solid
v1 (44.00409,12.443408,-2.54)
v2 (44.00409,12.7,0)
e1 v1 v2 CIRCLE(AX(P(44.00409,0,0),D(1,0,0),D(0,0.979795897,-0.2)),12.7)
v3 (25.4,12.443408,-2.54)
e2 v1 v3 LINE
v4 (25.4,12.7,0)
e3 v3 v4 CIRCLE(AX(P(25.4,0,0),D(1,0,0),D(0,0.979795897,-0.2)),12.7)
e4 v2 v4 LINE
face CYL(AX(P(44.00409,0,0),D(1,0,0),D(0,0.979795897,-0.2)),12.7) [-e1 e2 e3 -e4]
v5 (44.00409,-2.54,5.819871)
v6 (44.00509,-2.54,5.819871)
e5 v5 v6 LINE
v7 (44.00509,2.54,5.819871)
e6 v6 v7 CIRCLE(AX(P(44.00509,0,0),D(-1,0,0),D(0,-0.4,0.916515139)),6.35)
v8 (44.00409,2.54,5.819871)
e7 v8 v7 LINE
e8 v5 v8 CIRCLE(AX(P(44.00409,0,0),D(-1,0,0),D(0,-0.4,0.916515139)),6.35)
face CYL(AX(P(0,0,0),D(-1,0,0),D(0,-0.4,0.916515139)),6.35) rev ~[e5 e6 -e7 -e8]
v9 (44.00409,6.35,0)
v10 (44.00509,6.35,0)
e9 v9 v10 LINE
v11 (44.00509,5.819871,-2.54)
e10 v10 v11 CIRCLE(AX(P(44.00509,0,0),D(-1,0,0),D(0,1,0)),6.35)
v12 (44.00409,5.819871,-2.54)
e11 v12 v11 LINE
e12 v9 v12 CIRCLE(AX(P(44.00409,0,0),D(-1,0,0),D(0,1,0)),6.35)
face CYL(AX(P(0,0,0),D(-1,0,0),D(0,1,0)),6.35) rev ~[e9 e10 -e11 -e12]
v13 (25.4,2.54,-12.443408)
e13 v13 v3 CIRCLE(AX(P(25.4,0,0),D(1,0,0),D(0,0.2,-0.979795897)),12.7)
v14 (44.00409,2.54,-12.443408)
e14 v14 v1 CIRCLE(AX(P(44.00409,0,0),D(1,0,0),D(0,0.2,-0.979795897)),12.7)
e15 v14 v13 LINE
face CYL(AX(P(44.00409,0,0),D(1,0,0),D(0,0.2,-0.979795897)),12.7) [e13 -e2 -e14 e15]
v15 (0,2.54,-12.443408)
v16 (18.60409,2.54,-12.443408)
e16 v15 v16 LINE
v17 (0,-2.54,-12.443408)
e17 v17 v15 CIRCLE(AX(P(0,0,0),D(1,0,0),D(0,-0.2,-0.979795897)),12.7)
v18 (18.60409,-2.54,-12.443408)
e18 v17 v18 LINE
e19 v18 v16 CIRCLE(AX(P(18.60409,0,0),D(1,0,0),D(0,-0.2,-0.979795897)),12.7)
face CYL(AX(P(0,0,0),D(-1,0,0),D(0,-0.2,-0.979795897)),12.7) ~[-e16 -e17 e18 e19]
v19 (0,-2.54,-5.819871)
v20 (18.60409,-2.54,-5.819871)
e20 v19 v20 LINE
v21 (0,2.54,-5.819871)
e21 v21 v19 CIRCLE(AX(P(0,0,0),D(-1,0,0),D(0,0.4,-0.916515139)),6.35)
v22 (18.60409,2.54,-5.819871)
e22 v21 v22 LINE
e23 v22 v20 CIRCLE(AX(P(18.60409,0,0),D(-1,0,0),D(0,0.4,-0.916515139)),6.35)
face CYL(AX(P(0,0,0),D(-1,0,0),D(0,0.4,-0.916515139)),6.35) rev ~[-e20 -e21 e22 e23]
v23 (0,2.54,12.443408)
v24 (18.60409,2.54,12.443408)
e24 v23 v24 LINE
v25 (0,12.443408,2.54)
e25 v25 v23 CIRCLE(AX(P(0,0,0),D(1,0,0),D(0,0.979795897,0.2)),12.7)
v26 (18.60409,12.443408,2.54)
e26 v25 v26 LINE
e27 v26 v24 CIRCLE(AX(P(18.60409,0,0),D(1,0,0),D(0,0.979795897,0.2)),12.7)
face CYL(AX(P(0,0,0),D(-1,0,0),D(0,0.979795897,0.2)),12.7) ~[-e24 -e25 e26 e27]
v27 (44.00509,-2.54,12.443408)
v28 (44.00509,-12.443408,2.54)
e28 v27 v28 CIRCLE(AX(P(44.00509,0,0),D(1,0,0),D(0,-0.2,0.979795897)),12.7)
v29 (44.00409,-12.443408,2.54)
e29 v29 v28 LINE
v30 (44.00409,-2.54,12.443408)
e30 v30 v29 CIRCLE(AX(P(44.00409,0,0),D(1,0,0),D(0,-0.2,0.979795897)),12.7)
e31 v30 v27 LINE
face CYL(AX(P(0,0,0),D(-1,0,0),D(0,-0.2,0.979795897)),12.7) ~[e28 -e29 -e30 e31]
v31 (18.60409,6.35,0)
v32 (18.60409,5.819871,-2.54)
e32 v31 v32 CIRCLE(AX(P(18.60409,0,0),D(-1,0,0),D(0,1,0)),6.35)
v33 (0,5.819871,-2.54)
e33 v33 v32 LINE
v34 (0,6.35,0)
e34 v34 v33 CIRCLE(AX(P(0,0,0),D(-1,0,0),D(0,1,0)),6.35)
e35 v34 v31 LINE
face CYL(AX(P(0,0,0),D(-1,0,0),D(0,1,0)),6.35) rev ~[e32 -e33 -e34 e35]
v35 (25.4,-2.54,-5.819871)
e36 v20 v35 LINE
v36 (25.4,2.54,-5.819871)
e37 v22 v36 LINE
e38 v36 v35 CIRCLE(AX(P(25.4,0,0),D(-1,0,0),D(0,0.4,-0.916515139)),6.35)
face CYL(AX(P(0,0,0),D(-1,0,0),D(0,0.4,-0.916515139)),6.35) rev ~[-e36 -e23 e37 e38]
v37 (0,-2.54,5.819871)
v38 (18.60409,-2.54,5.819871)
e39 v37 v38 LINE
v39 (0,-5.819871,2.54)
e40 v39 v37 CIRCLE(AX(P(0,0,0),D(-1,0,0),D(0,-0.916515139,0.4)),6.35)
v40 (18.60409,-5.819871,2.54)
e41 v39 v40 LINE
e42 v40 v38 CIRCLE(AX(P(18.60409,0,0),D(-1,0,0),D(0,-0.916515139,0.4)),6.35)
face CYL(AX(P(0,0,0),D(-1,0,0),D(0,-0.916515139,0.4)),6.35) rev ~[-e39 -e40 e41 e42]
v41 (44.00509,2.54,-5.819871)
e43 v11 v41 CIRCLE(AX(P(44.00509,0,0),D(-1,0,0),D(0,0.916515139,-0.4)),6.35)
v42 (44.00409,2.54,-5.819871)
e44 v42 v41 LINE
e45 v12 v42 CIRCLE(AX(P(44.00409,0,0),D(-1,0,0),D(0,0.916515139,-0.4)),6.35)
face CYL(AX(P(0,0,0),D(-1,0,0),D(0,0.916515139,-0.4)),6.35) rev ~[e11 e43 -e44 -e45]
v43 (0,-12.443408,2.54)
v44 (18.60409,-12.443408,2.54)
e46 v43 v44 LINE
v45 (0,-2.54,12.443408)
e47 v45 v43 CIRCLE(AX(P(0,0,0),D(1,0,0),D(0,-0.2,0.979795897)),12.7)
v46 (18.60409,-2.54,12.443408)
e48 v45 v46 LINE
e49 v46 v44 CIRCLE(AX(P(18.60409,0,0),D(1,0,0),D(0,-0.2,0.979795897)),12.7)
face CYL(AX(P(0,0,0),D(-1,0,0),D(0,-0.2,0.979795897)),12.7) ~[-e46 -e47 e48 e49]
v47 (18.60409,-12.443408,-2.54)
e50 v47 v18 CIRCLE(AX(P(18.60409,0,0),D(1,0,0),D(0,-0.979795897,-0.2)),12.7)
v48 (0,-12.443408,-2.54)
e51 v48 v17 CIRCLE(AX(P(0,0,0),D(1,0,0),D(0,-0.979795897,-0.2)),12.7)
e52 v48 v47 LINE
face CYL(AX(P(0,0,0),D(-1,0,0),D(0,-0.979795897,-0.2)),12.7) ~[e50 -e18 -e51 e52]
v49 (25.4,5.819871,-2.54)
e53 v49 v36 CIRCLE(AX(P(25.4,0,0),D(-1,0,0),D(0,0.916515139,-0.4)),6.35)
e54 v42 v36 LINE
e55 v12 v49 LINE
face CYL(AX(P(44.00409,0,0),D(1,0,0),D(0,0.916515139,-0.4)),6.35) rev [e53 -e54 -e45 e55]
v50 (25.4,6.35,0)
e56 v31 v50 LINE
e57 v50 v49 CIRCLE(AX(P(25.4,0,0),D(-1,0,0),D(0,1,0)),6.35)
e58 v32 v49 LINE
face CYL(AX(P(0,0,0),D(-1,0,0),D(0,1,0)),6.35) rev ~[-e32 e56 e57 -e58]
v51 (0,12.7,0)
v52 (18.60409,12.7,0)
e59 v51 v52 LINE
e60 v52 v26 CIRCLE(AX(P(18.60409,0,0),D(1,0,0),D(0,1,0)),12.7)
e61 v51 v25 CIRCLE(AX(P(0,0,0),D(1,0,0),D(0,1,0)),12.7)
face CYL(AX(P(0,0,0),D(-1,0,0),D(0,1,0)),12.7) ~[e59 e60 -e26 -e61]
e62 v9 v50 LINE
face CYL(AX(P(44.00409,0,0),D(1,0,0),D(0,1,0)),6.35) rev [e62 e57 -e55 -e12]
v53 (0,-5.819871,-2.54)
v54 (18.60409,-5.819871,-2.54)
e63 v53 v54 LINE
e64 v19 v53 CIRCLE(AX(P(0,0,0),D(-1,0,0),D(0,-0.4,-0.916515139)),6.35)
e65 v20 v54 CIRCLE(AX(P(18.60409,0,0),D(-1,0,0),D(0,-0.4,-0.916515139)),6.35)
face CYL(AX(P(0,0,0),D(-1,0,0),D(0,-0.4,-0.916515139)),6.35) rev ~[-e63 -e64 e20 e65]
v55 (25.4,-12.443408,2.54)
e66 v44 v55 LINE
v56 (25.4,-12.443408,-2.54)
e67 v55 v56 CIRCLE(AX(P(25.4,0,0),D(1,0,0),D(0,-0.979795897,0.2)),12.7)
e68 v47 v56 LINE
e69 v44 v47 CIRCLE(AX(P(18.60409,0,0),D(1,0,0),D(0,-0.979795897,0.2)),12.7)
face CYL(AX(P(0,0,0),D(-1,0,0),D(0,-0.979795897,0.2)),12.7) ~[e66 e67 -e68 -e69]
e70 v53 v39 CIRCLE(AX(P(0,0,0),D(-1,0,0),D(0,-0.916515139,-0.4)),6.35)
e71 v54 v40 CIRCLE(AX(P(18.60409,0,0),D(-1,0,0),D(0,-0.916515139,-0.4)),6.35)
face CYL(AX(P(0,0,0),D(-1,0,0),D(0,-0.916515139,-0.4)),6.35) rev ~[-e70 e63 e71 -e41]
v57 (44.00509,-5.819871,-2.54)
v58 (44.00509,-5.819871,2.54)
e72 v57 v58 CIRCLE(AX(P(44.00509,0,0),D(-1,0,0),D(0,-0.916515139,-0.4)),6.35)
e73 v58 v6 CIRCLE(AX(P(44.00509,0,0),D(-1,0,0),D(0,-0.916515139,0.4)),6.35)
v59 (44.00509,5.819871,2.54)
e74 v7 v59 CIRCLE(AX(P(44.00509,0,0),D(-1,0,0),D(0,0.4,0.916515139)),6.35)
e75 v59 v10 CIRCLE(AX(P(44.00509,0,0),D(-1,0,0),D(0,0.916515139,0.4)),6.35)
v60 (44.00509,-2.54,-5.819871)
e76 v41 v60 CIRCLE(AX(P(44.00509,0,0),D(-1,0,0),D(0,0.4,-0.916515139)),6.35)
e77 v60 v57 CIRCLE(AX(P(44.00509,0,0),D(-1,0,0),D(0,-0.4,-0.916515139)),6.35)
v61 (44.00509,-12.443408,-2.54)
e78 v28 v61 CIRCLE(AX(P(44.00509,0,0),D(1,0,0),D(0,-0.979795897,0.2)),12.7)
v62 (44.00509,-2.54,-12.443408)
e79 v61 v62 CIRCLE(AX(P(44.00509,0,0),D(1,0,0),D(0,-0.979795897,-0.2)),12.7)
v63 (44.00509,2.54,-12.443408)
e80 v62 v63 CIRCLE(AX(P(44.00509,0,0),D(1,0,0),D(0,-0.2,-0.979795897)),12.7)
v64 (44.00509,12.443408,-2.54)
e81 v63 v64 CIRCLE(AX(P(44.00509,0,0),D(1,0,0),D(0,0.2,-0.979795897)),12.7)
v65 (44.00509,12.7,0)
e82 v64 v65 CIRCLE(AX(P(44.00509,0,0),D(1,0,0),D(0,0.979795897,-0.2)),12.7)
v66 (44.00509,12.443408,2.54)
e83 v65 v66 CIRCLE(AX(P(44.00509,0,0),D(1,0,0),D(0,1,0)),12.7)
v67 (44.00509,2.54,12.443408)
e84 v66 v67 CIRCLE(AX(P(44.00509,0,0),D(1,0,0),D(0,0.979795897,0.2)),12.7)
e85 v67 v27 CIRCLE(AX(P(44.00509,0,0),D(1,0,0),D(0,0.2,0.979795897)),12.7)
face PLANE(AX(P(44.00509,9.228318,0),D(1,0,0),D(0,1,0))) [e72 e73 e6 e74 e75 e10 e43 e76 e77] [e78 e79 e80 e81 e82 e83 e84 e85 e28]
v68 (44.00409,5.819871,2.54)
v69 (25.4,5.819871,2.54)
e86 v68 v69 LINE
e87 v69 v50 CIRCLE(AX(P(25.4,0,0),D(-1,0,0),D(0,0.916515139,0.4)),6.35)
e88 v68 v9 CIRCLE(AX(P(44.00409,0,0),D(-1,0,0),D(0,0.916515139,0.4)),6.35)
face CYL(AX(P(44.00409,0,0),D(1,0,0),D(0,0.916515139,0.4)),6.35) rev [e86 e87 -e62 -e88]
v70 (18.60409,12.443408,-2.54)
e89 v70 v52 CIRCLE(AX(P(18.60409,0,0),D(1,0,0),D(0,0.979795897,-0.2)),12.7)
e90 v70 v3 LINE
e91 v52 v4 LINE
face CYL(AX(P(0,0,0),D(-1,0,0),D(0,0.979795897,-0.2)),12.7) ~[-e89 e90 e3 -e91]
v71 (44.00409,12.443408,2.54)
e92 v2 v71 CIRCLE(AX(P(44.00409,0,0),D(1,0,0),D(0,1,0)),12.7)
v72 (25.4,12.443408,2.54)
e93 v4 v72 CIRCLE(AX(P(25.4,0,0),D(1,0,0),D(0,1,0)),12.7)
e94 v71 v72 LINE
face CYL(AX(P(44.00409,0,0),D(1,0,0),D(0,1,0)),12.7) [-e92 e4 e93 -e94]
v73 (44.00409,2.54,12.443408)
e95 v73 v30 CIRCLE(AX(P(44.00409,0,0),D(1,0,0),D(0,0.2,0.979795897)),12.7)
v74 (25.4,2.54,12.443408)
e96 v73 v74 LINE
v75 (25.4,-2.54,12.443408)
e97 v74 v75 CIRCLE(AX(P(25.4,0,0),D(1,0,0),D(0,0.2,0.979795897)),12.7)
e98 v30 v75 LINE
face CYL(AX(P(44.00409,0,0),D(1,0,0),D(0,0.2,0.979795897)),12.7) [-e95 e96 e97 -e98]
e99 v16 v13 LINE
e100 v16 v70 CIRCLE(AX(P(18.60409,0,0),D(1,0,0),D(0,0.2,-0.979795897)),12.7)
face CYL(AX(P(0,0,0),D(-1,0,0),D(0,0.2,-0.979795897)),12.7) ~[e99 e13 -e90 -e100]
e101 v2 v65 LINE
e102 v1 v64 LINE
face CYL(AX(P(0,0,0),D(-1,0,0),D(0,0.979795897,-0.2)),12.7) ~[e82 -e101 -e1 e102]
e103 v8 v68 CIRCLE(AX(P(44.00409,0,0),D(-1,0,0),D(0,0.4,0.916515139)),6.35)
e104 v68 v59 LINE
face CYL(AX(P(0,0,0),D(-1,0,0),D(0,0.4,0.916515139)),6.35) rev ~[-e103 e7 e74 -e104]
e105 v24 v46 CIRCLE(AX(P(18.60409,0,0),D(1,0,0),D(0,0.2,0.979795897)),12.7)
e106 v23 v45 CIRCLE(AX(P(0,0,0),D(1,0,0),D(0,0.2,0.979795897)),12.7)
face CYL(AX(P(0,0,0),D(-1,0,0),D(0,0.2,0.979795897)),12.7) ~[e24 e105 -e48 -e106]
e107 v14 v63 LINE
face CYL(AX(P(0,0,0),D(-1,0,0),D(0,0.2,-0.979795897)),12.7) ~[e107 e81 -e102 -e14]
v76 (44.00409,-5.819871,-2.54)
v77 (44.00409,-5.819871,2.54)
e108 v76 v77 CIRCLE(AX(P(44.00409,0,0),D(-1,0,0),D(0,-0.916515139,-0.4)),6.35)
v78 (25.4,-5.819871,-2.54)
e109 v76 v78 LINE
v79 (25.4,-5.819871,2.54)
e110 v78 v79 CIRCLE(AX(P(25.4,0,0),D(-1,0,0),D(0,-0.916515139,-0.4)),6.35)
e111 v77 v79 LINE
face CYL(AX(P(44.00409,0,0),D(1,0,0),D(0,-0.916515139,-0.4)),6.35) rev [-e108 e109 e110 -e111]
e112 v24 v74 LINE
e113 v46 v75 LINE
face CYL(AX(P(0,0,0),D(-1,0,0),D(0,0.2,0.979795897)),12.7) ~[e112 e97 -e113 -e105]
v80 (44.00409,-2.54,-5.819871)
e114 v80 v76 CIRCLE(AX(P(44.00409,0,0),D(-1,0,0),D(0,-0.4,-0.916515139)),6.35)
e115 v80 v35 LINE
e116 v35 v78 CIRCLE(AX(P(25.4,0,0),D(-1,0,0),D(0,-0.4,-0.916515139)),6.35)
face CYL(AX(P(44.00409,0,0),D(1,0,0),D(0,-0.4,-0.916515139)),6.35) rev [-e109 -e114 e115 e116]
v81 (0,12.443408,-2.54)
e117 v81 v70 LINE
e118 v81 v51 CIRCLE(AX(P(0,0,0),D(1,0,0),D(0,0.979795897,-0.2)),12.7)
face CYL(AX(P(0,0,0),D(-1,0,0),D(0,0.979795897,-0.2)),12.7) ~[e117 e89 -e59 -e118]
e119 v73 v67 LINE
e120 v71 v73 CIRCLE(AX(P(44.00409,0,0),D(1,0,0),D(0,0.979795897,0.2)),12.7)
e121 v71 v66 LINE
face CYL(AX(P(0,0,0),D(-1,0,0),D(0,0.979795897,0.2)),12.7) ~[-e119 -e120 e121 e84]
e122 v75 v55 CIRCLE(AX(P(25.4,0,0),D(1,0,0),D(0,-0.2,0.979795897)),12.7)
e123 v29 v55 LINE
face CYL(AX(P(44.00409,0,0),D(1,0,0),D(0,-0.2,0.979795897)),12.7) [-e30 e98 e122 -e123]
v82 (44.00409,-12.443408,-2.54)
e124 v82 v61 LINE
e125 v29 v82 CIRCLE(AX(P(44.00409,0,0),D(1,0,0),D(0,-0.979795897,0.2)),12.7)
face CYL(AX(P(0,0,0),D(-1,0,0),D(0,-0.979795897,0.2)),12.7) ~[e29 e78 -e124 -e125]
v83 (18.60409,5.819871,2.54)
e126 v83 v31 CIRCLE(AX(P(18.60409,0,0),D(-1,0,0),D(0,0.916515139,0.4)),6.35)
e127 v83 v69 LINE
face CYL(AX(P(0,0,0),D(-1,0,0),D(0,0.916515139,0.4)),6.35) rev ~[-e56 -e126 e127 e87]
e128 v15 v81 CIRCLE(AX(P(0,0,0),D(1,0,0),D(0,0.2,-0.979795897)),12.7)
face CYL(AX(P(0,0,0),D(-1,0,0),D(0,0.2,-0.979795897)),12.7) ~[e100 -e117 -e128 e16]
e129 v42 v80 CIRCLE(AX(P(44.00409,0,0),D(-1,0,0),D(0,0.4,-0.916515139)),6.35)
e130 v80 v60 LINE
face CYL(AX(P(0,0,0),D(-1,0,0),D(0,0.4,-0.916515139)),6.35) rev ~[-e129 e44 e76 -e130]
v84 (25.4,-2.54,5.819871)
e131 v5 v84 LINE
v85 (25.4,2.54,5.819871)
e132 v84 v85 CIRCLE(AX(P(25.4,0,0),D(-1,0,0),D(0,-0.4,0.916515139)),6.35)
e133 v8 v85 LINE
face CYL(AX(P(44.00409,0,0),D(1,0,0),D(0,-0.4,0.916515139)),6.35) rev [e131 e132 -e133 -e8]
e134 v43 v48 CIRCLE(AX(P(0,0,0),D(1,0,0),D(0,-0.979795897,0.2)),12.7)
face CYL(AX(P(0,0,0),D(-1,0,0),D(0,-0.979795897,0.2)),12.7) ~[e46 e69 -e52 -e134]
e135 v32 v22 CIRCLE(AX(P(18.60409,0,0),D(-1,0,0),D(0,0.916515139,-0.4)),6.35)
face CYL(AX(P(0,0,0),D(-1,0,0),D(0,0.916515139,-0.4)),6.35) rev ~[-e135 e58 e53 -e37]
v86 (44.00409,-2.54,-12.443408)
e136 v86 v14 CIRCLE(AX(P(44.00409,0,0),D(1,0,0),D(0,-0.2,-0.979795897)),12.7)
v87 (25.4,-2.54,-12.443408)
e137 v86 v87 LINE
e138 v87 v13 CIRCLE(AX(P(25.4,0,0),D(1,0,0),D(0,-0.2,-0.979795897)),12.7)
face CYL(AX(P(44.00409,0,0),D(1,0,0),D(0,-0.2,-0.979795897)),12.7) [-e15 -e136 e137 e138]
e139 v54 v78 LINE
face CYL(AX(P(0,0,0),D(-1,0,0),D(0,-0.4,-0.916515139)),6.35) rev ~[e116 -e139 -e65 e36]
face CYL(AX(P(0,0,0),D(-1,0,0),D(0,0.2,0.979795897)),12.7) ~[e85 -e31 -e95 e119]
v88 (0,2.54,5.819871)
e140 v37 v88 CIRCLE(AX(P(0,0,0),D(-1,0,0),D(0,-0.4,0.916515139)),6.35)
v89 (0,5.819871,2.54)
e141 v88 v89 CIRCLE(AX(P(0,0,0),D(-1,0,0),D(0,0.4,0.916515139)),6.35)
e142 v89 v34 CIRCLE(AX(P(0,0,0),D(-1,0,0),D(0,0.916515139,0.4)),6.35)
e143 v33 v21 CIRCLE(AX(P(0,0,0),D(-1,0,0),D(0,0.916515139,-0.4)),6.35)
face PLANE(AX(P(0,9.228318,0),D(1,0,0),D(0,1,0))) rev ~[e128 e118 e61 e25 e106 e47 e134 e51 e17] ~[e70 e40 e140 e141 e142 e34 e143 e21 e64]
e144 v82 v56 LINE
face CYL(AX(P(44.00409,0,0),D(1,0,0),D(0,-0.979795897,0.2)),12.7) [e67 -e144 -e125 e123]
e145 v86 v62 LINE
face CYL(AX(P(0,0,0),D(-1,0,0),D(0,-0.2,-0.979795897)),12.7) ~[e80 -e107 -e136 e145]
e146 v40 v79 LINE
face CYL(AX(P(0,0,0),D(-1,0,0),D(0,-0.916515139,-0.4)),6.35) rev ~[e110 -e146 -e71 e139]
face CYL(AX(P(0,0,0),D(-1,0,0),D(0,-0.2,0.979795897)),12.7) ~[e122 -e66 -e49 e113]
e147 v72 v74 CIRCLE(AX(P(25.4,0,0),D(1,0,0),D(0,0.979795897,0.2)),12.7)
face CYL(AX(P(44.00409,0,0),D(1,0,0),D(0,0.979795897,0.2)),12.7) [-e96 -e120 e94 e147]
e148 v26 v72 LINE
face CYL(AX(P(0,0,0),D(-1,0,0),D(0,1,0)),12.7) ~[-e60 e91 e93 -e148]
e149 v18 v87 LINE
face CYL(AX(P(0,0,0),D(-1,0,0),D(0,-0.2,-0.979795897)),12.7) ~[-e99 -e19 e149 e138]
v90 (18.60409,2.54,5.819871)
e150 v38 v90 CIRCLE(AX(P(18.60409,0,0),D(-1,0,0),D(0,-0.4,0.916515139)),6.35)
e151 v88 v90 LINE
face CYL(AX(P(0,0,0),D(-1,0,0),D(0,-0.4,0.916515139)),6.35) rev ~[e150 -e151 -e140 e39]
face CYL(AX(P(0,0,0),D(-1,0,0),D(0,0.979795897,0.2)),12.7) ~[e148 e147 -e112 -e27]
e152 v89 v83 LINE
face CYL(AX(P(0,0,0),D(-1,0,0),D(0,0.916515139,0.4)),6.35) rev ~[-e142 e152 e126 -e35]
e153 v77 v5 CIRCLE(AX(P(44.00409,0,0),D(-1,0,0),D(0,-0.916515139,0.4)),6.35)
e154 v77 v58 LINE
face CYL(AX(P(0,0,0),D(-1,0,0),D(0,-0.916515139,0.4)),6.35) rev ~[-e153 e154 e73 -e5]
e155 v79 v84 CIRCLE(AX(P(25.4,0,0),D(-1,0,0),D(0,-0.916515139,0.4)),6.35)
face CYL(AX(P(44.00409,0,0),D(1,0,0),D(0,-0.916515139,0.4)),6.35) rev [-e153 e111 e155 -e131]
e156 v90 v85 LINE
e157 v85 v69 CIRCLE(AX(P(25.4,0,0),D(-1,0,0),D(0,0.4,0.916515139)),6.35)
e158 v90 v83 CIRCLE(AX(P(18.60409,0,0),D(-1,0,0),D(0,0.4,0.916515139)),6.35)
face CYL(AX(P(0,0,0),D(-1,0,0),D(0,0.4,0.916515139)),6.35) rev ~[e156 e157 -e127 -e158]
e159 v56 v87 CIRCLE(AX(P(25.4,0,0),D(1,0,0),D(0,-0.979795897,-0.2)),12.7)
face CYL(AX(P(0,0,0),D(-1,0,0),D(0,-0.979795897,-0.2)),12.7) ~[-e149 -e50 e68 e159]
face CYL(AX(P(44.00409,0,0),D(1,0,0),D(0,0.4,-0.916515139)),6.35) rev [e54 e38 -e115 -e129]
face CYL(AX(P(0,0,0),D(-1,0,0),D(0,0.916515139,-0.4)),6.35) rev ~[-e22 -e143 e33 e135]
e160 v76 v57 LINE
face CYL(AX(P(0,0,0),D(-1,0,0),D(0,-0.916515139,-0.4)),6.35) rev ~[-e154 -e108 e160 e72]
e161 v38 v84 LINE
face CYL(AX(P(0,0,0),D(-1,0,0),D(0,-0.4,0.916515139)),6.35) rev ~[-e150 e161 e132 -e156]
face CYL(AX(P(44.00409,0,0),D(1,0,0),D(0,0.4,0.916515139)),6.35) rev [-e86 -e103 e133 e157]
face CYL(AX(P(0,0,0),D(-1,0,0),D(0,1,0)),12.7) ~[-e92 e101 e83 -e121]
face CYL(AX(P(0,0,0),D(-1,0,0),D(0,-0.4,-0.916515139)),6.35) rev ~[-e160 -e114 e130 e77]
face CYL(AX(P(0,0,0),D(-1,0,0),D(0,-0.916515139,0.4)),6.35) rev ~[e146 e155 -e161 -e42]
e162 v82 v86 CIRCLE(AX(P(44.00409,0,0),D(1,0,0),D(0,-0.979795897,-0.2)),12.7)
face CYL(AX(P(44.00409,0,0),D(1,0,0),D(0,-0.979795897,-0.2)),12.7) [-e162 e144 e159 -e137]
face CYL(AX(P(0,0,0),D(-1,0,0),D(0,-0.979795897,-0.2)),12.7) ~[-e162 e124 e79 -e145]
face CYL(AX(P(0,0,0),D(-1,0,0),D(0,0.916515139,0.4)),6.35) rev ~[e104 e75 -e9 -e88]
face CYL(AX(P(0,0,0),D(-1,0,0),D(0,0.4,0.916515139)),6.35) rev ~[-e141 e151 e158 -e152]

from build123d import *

# Parameters (mm, degrees)
F1_DEPTH = 25.4
F2_DEPTH = 44.00509


# Not quite as in the source:
# - a pattern or mirror of a feature is missing from the dataset's text; its kind, count and spacing are read off the source's solid
# - a feature names something its author has since deleted; it is built from what else it names


with BuildPart() as f1:
    # F0 (on Right) → F1 (new body)
    with BuildSketch(Plane.YZ):
        with BuildLine():
            ThreePointArc((12.4434078933, -2.54), (12.6356891432, -1.2764638175), (12.7, 0))
            ThreePointArc((12.7, 0), (12.6356891432, 1.2764638175), (12.4434078933, 2.54))
            Line((12.4434078933, 2.54), (5.8198711326, 2.54))
            ThreePointArc((5.8198711326, 2.54), (6.2160550871, 1.2973662374), (6.35, 0))
            ThreePointArc((6.35, 0), (6.2160550871, -1.2973662374), (5.8198711326, -2.54))
            Line((5.8198711326, -2.54), (12.4434078933, -2.54))
        make_face()
        with BuildLine():
            Line((5.8198711326, 2.54), (12.4434078933, 2.54))
            ThreePointArc((12.4434078933, 2.54), (8.9802561211, 8.9802561211), (2.54, 12.4434078933))
            Line((2.54, 12.4434078933), (2.54, 5.8198711326))
            ThreePointArc((2.54, 5.8198711326), (4.4901280605, 4.4901280605), (5.8198711326, 2.54))
        make_face()
        with BuildLine():
            ThreePointArc((2.54, -12.4434078933), (8.9802561211, -8.9802561211), (12.4434078933, -2.54))
            Line((12.4434078933, -2.54), (5.8198711326, -2.54))
            ThreePointArc((5.8198711326, -2.54), (4.4901280605, -4.4901280605), (2.54, -5.8198711326))
            Line((2.54, -5.8198711326), (2.54, -12.4434078933))
        make_face()
        with BuildLine():
            Line((2.54, 5.8198711326), (2.54, 12.4434078933))
            ThreePointArc((2.54, 12.4434078933), (0, 12.7), (-2.54, 12.4434078933))
            Line((-2.54, 12.4434078933), (-2.54, 5.8198711326))
            ThreePointArc((-2.54, 5.8198711326), (0, 6.35), (2.54, 5.8198711326))
        make_face()
        with BuildLine():
            ThreePointArc((-2.54, -12.4434078933), (0, -12.7), (2.54, -12.4434078933))
            Line((2.54, -12.4434078933), (2.54, -5.8198711326))
            ThreePointArc((2.54, -5.8198711326), (0, -6.35), (-2.54, -5.8198711326))
            Line((-2.54, -5.8198711326), (-2.54, -12.4434078933))
        make_face()
        with BuildLine():
            Line((-2.54, 5.8198711326), (-2.54, 12.4434078933))
            ThreePointArc((-2.54, 12.4434078933), (-8.9802561211, 8.9802561211), (-12.4434078933, 2.54))
            Line((-12.4434078933, 2.54), (-5.8198711326, 2.54))
            ThreePointArc((-5.8198711326, 2.54), (-4.4901280605, 4.4901280605), (-2.54, 5.8198711326))
        make_face()
        with BuildLine():
            ThreePointArc((-12.4434078933, -2.54), (-8.9802561211, -8.9802561211), (-2.54, -12.4434078933))
            Line((-2.54, -12.4434078933), (-2.54, -5.8198711326))
            ThreePointArc((-2.54, -5.8198711326), (-4.4901280605, -4.4901280605), (-5.8198711326, -2.54))
            Line((-5.8198711326, -2.54), (-12.4434078933, -2.54))
        make_face()
        with BuildLine():
            Line((-5.8198711326, 2.54), (-12.4434078933, 2.54))
            ThreePointArc((-12.4434078933, 2.54), (-12.7, 0), (-12.4434078933, -2.54))
            Line((-12.4434078933, -2.54), (-5.8198711326, -2.54))
            ThreePointArc((-5.8198711326, -2.54), (-6.35, 0), (-5.8198711326, 2.54))
        make_face()
    extrude(amount=F1_DEPTH)

    # F1_copies: F1 across plane


with BuildPart() as f1_1:
    add(f1.part)
    add(f1.part.mirror(Plane(origin=(22.002045, 0, 0), x_dir=(0, 0, 1), z_dir=(1, 0, 0))))

    # F0 (on Right) → F2 (join, through all)
    with BuildSketch(Plane.YZ):
        with BuildLine():
            ThreePointArc((12.4434078933, -2.54), (12.6356891432, -1.2764638175), (12.7, 0))
            ThreePointArc((12.7, 0), (12.6356891432, 1.2764638175), (12.4434078933, 2.54))
            Line((12.4434078933, 2.54), (5.8198711326, 2.54))
            ThreePointArc((5.8198711326, 2.54), (6.2160550871, 1.2973662374), (6.35, 0))
            ThreePointArc((6.35, 0), (6.2160550871, -1.2973662374), (5.8198711326, -2.54))
            Line((5.8198711326, -2.54), (12.4434078933, -2.54))
        make_face()
        with BuildLine():
            Line((5.8198711326, 2.54), (12.4434078933, 2.54))
            ThreePointArc((12.4434078933, 2.54), (8.9802561211, 8.9802561211), (2.54, 12.4434078933))
            Line((2.54, 12.4434078933), (2.54, 5.8198711326))
            ThreePointArc((2.54, 5.8198711326), (4.4901280605, 4.4901280605), (5.8198711326, 2.54))
        make_face()
        with BuildLine():
            ThreePointArc((2.54, -12.4434078933), (8.9802561211, -8.9802561211), (12.4434078933, -2.54))
            Line((12.4434078933, -2.54), (5.8198711326, -2.54))
            ThreePointArc((5.8198711326, -2.54), (4.4901280605, -4.4901280605), (2.54, -5.8198711326))
            Line((2.54, -5.8198711326), (2.54, -12.4434078933))
        make_face()
        with BuildLine():
            Line((2.54, 5.8198711326), (2.54, 12.4434078933))
            ThreePointArc((2.54, 12.4434078933), (0, 12.7), (-2.54, 12.4434078933))
            Line((-2.54, 12.4434078933), (-2.54, 5.8198711326))
            ThreePointArc((-2.54, 5.8198711326), (0, 6.35), (2.54, 5.8198711326))
        make_face()
        with BuildLine():
            ThreePointArc((-2.54, -12.4434078933), (0, -12.7), (2.54, -12.4434078933))
            Line((2.54, -12.4434078933), (2.54, -5.8198711326))
            ThreePointArc((2.54, -5.8198711326), (0, -6.35), (-2.54, -5.8198711326))
            Line((-2.54, -5.8198711326), (-2.54, -12.4434078933))
        make_face()
        with BuildLine():
            Line((-2.54, 5.8198711326), (-2.54, 12.4434078933))
            ThreePointArc((-2.54, 12.4434078933), (-8.9802561211, 8.9802561211), (-12.4434078933, 2.54))
            Line((-12.4434078933, 2.54), (-5.8198711326, 2.54))
            ThreePointArc((-5.8198711326, 2.54), (-4.4901280605, 4.4901280605), (-2.54, 5.8198711326))
        make_face()
        with BuildLine():
            ThreePointArc((-12.4434078933, -2.54), (-8.9802561211, -8.9802561211), (-2.54, -12.4434078933))
            Line((-2.54, -12.4434078933), (-2.54, -5.8198711326))
            ThreePointArc((-2.54, -5.8198711326), (-4.4901280605, -4.4901280605), (-5.8198711326, -2.54))
            Line((-5.8198711326, -2.54), (-12.4434078933, -2.54))
        make_face()
        with BuildLine():
            Line((-5.8198711326, 2.54), (-12.4434078933, 2.54))
            ThreePointArc((-12.4434078933, 2.54), (-12.7, 0), (-12.4434078933, -2.54))
            Line((-12.4434078933, -2.54), (-5.8198711326, -2.54))
            ThreePointArc((-5.8198711326, -2.54), (-6.35, 0), (-5.8198711326, 2.54))
        make_face()
    extrude(amount=F2_DEPTH)


solid = f1_1.part
